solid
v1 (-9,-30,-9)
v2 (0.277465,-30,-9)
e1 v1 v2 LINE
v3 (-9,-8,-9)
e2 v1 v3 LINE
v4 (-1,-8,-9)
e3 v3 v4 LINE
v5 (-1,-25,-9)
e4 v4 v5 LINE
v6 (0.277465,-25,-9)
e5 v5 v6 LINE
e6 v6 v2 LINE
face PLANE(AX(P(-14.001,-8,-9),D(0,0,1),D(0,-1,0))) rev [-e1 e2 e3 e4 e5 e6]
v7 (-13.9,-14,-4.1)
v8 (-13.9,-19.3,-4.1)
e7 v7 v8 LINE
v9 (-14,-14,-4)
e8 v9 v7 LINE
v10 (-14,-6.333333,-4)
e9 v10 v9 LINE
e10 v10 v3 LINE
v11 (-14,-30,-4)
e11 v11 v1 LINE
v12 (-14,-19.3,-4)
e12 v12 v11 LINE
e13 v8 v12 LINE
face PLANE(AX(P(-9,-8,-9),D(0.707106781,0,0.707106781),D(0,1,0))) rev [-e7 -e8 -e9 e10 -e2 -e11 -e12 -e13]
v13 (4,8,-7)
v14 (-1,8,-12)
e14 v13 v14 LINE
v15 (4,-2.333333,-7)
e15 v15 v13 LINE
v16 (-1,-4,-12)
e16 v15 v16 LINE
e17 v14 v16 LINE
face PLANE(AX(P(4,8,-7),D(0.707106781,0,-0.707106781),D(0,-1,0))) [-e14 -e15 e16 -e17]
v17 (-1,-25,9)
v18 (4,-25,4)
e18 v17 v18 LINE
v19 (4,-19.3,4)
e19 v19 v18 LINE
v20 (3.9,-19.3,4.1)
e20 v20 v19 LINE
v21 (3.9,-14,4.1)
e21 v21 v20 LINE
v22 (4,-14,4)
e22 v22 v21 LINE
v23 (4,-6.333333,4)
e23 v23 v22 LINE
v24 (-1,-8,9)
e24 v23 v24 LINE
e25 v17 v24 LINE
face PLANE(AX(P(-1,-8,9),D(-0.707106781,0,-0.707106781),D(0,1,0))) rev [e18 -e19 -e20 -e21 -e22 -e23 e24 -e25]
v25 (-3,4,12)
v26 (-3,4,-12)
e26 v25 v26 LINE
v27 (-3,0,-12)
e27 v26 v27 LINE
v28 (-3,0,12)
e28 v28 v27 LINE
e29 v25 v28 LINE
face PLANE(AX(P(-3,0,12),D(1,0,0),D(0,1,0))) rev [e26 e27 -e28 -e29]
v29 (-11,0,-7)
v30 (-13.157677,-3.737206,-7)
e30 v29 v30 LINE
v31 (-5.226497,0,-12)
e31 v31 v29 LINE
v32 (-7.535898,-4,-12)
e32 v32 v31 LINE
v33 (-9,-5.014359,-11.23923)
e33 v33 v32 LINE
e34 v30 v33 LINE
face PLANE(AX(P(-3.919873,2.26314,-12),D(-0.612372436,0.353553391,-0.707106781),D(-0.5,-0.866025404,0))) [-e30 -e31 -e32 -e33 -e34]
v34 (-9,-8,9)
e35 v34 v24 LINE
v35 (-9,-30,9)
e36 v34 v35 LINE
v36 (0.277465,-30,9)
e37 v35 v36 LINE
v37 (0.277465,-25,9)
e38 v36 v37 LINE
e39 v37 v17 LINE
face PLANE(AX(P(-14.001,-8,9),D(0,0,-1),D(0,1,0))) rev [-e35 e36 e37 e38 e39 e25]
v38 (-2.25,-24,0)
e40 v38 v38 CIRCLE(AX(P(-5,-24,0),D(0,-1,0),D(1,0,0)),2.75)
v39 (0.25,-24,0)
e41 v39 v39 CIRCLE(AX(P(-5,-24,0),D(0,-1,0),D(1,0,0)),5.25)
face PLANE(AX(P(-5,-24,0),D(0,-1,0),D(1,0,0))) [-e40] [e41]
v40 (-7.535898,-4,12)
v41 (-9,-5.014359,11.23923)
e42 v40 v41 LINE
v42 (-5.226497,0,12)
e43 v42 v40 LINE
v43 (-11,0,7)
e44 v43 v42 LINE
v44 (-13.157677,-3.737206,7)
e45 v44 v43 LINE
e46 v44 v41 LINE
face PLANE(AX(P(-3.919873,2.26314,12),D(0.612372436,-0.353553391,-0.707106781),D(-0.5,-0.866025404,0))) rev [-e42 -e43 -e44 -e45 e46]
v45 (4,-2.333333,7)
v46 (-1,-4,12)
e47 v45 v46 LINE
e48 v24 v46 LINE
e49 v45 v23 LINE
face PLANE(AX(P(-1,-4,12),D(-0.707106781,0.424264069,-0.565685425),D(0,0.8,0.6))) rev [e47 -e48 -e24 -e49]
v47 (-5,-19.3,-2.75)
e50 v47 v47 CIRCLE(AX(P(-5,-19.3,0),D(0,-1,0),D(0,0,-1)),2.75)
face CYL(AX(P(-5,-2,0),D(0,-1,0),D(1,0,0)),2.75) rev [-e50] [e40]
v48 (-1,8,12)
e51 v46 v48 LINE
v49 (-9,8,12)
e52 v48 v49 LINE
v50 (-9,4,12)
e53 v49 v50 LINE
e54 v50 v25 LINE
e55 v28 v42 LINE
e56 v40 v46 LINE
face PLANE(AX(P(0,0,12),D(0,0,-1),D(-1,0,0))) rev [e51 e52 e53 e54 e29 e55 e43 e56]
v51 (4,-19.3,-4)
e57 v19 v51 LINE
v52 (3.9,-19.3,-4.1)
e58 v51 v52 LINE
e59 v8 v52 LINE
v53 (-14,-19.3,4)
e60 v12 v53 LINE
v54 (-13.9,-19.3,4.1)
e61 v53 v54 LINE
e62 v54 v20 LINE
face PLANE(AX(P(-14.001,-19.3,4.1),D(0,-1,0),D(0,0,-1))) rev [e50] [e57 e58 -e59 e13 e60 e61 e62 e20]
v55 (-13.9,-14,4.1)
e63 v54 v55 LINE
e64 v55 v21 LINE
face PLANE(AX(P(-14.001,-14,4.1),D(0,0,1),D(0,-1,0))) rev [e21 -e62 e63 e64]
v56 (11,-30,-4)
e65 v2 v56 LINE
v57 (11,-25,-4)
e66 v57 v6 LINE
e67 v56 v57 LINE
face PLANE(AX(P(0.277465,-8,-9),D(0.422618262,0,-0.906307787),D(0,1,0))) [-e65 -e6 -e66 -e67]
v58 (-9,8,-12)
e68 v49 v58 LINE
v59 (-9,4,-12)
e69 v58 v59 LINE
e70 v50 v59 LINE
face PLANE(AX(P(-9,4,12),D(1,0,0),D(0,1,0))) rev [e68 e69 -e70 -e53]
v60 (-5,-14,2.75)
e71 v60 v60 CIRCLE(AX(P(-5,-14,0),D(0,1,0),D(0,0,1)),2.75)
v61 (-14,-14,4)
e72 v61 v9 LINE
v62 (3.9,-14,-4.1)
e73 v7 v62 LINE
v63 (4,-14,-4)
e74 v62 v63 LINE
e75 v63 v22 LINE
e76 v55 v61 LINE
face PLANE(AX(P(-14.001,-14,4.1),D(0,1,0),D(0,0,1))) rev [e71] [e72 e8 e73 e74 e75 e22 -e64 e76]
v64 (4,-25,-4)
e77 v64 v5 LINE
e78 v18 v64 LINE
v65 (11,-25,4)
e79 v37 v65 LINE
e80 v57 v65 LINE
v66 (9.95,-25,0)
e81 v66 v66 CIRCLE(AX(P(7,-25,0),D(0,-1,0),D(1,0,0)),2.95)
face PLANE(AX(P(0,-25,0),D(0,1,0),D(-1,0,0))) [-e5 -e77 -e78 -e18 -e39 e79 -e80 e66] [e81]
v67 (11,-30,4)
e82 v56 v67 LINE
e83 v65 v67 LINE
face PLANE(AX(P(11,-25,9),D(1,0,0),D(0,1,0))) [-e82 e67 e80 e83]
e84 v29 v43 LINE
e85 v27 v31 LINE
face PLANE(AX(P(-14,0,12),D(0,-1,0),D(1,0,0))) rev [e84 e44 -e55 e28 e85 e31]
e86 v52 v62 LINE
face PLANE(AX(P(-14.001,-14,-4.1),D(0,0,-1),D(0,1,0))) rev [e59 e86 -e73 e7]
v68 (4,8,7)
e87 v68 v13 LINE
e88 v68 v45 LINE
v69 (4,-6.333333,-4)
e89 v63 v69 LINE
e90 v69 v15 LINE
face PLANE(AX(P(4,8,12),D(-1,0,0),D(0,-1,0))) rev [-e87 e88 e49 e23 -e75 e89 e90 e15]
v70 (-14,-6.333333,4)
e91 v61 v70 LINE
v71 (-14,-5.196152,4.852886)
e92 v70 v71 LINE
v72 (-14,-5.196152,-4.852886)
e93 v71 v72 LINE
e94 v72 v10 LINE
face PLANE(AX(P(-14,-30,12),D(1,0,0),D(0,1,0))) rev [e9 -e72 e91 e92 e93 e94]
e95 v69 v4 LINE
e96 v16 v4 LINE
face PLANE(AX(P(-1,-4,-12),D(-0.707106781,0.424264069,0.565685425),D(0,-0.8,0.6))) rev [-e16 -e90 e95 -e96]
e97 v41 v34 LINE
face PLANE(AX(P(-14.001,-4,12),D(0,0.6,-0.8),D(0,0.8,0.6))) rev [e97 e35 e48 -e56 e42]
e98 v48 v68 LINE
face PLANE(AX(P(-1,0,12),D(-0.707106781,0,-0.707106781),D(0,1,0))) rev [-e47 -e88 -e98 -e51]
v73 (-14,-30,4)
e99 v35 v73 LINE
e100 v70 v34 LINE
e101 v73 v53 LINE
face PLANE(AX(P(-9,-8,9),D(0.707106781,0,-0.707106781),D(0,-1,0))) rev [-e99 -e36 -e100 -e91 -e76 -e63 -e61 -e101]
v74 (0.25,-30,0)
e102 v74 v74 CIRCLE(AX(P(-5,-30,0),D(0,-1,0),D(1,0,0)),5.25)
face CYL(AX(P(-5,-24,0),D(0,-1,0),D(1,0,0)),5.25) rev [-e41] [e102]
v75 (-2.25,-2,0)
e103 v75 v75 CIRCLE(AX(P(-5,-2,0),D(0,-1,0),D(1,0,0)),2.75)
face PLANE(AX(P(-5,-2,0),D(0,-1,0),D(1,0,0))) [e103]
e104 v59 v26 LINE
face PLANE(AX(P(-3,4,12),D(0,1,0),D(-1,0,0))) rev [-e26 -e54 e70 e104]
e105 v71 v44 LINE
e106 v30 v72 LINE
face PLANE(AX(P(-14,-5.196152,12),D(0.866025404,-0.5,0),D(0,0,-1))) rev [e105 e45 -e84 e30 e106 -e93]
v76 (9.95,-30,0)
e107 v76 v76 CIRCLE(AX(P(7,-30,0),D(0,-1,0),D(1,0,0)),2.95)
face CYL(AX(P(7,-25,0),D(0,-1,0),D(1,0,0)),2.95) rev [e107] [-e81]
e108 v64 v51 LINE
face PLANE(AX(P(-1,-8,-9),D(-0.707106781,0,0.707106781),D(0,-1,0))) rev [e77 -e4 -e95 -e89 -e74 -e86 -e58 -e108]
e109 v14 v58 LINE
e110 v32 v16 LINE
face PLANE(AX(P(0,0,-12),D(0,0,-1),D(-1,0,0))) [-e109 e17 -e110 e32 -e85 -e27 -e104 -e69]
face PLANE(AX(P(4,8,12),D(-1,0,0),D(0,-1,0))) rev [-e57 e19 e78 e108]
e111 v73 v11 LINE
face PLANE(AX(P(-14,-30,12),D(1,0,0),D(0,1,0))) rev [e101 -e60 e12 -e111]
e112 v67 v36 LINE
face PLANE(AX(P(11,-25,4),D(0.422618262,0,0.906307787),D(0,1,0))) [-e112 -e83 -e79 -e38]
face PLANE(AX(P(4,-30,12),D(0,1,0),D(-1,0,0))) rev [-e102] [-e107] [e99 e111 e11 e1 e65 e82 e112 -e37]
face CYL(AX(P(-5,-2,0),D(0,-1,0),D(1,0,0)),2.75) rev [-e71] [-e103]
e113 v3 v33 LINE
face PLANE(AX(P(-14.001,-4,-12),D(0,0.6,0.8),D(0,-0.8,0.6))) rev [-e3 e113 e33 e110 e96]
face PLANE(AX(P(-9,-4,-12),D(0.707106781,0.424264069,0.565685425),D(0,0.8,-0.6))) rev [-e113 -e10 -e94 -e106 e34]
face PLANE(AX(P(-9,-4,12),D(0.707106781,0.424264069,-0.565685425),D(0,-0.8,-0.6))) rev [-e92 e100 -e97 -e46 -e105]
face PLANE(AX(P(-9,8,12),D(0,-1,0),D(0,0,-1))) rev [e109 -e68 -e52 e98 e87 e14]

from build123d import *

# Parameters (mm, degrees)
BOSS_EXTRUDE1_DEPTH = 12
SKETCH2_R           = 5.25
CUT_EXTRUDE1_DEPTH  = 6
CHAMFER2_SIZE       = 3
CHAMFER2_SIZE2      = 5.196152423
SKETCH4_R           = 2.75
CUT_EXTRUDE3_DEPTH  = 28
CUT_EXTRUDE4_REACH  = 38.986
SKETCH5_W           = 8.2
SKETCH5_H           = 5.3
CUT_EXTRUDE6_REACH  = 38.986
CHAMFER3_SIZE       = 5
SKETCH8_R           = 2.95
BOSS_EXTRUDE2_DEPTH = 5
CHAMFER4_SIZE       = 5
CHAMFER4_SIZE2      = 10.722534603


with BuildPart() as part:
    # Sketch1 → Boss-Extrude1 (new, symmetric)
    with BuildSketch(Plane.XY):
        Polygon((-9, 8), (4, 8), (4, -30), (-14, -30), (-14, 0), (-3, 0), (-3, 4), (-9, 4), align=None)
    extrude(amount=BOSS_EXTRUDE1_DEPTH, both=True)

    # Sketch2 → Cut-Extrude1 (cut)
    with BuildSketch(Plane.XZ.offset(30)):
        with Locations((-5, 0)):
            Circle(SKETCH2_R)
    extrude(amount=-CUT_EXTRUDE1_DEPTH, mode=Mode.SUBTRACT)

    # Chamfer2
    chamfer2_edges = [part.edges().sort_by_distance(p)[0] for p in [
        (-14, 0, 0),
    ]]
    chamfer2_side = [part.faces().sort_by_distance(p)[0] for p in [
        (-8.5, 0, 0),
    ]]
    chamfer(chamfer2_edges, length=CHAMFER2_SIZE, length2=CHAMFER2_SIZE2, reference=chamfer2_side[0])

    # Sketch4 → Cut-Extrude3 (cut)
    with BuildSketch(Plane.XZ.offset(30)):
        with Locations((-5, 0)):
            Circle(SKETCH4_R)
    extrude(amount=-CUT_EXTRUDE3_DEPTH, mode=Mode.SUBTRACT)

    # Sketch5 → Cut-Extrude4 (cut, up to next)
    with BuildSketch(Plane(origin=(4, 0, 0), x_dir=(0, 0, -1), z_dir=(1, 0, 0)), mode=Mode.PRIVATE) as cut_extrude4_sk1:
        with Locations((0, -16.65)):
            Rectangle(SKETCH5_W, SKETCH5_H)
    cut_extrude4_tool1 = extrude(cut_extrude4_sk1.sketch, amount=-CUT_EXTRUDE4_REACH, mode=Mode.PRIVATE) & part.part
    add(cut_extrude4_tool1.solids().sort_by_distance((4, -16.65, 0))[0], mode=Mode.SUBTRACT)

    # Sketch7 → Cut-Extrude6 (cut, up to next)
    with BuildSketch(Plane(origin=(4, 0, 0), x_dir=(0, 0, -1), z_dir=(1, 0, 0)), mode=Mode.PRIVATE) as cut_extrude6_sk1:
        Polygon((-12, -30), (-12, -4), (-9, -8), (-9, -30), align=None)
    cut_extrude6_tool1 = extrude(cut_extrude6_sk1.sketch, amount=-CUT_EXTRUDE6_REACH, mode=Mode.PRIVATE) & part.part
    # Sketch7 → Cut-Extrude6 (cut, up to next)
    with BuildSketch(Plane(origin=(4, 0, 0), x_dir=(0, 0, -1), z_dir=(1, 0, 0)), mode=Mode.PRIVATE) as cut_extrude6_sk2:
        Polygon((9, -30), (12, -30), (12, -4), (9, -8), align=None)
    cut_extrude6_tool2 = extrude(cut_extrude6_sk2.sketch, amount=-CUT_EXTRUDE6_REACH, mode=Mode.PRIVATE) & part.part
    add(cut_extrude6_tool1.solids().sort_by_distance((4, -17.972222, 10.541667))[0], mode=Mode.SUBTRACT)
    add(cut_extrude6_tool2.solids().sort_by_distance((4, -17.972222, -10.541667))[0], mode=Mode.SUBTRACT)

    # Chamfer3
    # the kernel refuses this chamfer: 5 mm, written as the material it takes off along each edge
    with BuildSketch(Plane(origin=(4, 4.85841494, 9), x_dir=(0, 0, -1), z_dir=(0, -1, 0))) as chamfer3_piece_1_section:
        Polygon((CHAMFER3_SIZE, 0), (0, -CHAMFER3_SIZE), (0, 0), align=None)
    chamfer3_piece_1 = extrude(amount=47.71682988, mode=Mode.PRIVATE)
    chamfer3_piece_1 = split(chamfer3_piece_1, bisect_by=Plane(origin=(5.357524482, 4.043900251, 10.086019586), z_dir=(0.7071067811865478, -0.4242640687119279, 0.5656854249492383)), keep=Keep.TOP, mode=Mode.PRIVATE)
    add(chamfer3_piece_1, mode=Mode.SUBTRACT)
    with BuildSketch(Plane(origin=(4, 6.286731952, 19.715048964), x_dir=(0, 0.5999999999999992, -0.8000000000000004), z_dir=(0, -0.8000000000000005, -0.5999999999999993))) as chamfer3_piece_2_section:
        Polygon((CHAMFER3_SIZE, 0), (0, -CHAMFER3_SIZE), (0, 0), align=None)
    chamfer3_piece_2 = extrude(amount=30.71682988, mode=Mode.PRIVATE)
    chamfer3_piece_2 = split(chamfer3_piece_2, bisect_by=Plane(origin=(-3.857524482, 6.286731952, 11.857524482), z_dir=(0.7071067811865476, 0, 0.7071067811865476)), keep=Keep.TOP, mode=Mode.PRIVATE)
    add(chamfer3_piece_2, mode=Mode.SUBTRACT)
    with BuildSketch(Plane(origin=(4, 20.85841494, 12), x_dir=(0, 0, -1), z_dir=(0, -1, 0)), Plane(origin=(4, 20.85841494, -12), x_dir=(-1, 0, 0), z_dir=(0, -1, 0))) as chamfer3_piece_3:
        Polygon((CHAMFER3_SIZE, 0), (0, -CHAMFER3_SIZE), (0, 0), align=None)
    extrude(amount=37.71682988, mode=Mode.SUBTRACT)
    with BuildSketch(Plane(origin=(4, 6.286731952, -19.715048964), x_dir=(-1, 0, 0), z_dir=(0, -0.8000000000000006, 0.5999999999999993))) as chamfer3_piece_4_section:
        Polygon((CHAMFER3_SIZE, 0), (0, -CHAMFER3_SIZE), (0, 0), align=None)
    chamfer3_piece_4 = extrude(amount=30.71682988, mode=Mode.PRIVATE)
    chamfer3_piece_4 = split(chamfer3_piece_4, bisect_by=Plane(origin=(-3.857524482, 6.286731952, -11.857524482), z_dir=(0.7071067811865476, 0, -0.7071067811865476)), keep=Keep.TOP, mode=Mode.PRIVATE)
    add(chamfer3_piece_4, mode=Mode.SUBTRACT)
    with BuildSketch(Plane(origin=(4, 4.85841494, -9), x_dir=(0, 0, 1), z_dir=(0, -1, 0))) as chamfer3_piece_5_section:
        Polygon((CHAMFER3_SIZE, 0), (0, CHAMFER3_SIZE), (0, 0), align=None)
    chamfer3_piece_5 = extrude(amount=47.71682988, mode=Mode.PRIVATE)
    chamfer3_piece_5 = split(chamfer3_piece_5, bisect_by=Plane(origin=(5.357524482, 4.043900251, -10.086019586), z_dir=(0.7071067811865476, -0.424264068711928, -0.5656854249492386)), keep=Keep.TOP, mode=Mode.PRIVATE)
    add(chamfer3_piece_5, mode=Mode.SUBTRACT)
    with BuildSketch(Plane(origin=(-14, -42.85841494, -9), x_dir=(1, 0, 0), z_dir=(0, 1, 0))) as chamfer3_piece_6_section:
        Polygon((CHAMFER3_SIZE, 0), (0, -CHAMFER3_SIZE), (0, 0), align=None)
    chamfer3_piece_6 = extrude(amount=47.71682988, mode=Mode.PRIVATE)
    chamfer3_piece_6 = split(chamfer3_piece_6, bisect_by=Plane(origin=(-1.042475518, -35.083900251, 1.366019586), z_dir=(-0.7071067811865479, -0.42426406871192784, -0.5656854249492381)), keep=Keep.TOP, mode=Mode.PRIVATE)
    add(chamfer3_piece_6, mode=Mode.SUBTRACT)
    with BuildSketch(Plane(origin=(-14, -18.286731952, -1.284951036), x_dir=(1, 0, 0), z_dir=(0, 0.8000000000000006, -0.5999999999999993))) as chamfer3_piece_7_section:
        Polygon((CHAMFER3_SIZE, 0), (0, -CHAMFER3_SIZE), (0, 0), align=None)
    chamfer3_piece_7 = extrude(amount=29.221639351, mode=Mode.PRIVATE)
    chamfer3_piece_7 = split(chamfer3_piece_7, bisect_by=Plane(origin=(-15.357524482, -18.286731952, -2.642475518), z_dir=(-0.7071067811865476, 0, -0.7071067811865476)), keep=Keep.TOP, mode=Mode.PRIVATE)
    add(chamfer3_piece_7, mode=Mode.SUBTRACT)
    with BuildSketch(Plane(origin=(-4.57079253, 11.13571399, -12), x_dir=(0.8660254037844396, -0.49999999999999833, 0), z_dir=(-0.49999999999999833, -0.8660254037844397, 0))) as chamfer3_piece_8_section:
        Polygon((CHAMFER3_SIZE, 0), (0, CHAMFER3_SIZE), (0, 0), align=None)
    chamfer3_piece_8 = extrude(amount=30.335632033, mode=Mode.PRIVATE)
    chamfer3_piece_8 = split(chamfer3_piece_8, bisect_by=Plane(origin=(-4.57079253, 0, -12), z_dir=(0, -1, 0)), keep=Keep.TOP, mode=Mode.PRIVATE)
    add(chamfer3_piece_8, mode=Mode.SUBTRACT)
    with BuildSketch(Plane(origin=(-4.57079253, 11.13571399, 12), x_dir=(0, 0, -1), z_dir=(-0.49999999999999833, -0.8660254037844397, 0))) as chamfer3_piece_9_section:
        Polygon((CHAMFER3_SIZE, 0), (0, CHAMFER3_SIZE), (0, 0), align=None)
    chamfer3_piece_9 = extrude(amount=30.335632033, mode=Mode.PRIVATE)
    chamfer3_piece_9 = split(chamfer3_piece_9, bisect_by=Plane(origin=(-4.57079253, 0, 12), z_dir=(0, -1, 0)), keep=Keep.TOP, mode=Mode.PRIVATE)
    add(chamfer3_piece_9, mode=Mode.SUBTRACT)
    with BuildSketch(Plane(origin=(-14, -18.286731952, 1.284951036), x_dir=(0, 0.5999999999999993, -0.8000000000000005), z_dir=(0, 0.8000000000000005, 0.5999999999999993))) as chamfer3_piece_10_section:
        Polygon((CHAMFER3_SIZE, 0), (0, -CHAMFER3_SIZE), (0, 0), align=None)
    chamfer3_piece_10 = extrude(amount=29.221639351, mode=Mode.PRIVATE)
    chamfer3_piece_10 = split(chamfer3_piece_10, bisect_by=Plane(origin=(-15.357524482, -18.286731952, 2.642475518), z_dir=(-0.7071067811865476, 0, 0.7071067811865476)), keep=Keep.TOP, mode=Mode.PRIVATE)
    add(chamfer3_piece_10, mode=Mode.SUBTRACT)
    with BuildSketch(Plane(origin=(-14, -42.85841494, 9), x_dir=(0, 0, -1), z_dir=(0, 1, 0))) as chamfer3_piece_11_section:
        Polygon((CHAMFER3_SIZE, 0), (0, -CHAMFER3_SIZE), (0, 0), align=None)
    chamfer3_piece_11 = extrude(amount=47.71682988, mode=Mode.PRIVATE)
    chamfer3_piece_11 = split(chamfer3_piece_11, bisect_by=Plane(origin=(-1.042475518, -35.083900251, -1.366019586), z_dir=(-0.7071067811865476, -0.4242640687119281, 0.5656854249492385)), keep=Keep.TOP, mode=Mode.PRIVATE)
    add(chamfer3_piece_11, mode=Mode.SUBTRACT)

    # Sketch8 → Boss-Extrude2 (add)
    with BuildSketch(Plane.XZ.offset(30)):
        Polygon((4, 4), (-1, 9), (11, 9), (11, -9), (-1, -9), (4, -4), align=None)
        with Locations((7, 0)):
            Circle(SKETCH8_R, mode=Mode.SUBTRACT)
    extrude(amount=-BOSS_EXTRUDE2_DEPTH)

    # Chamfer4
    chamfer4_edges = [part.edges().sort_by_distance(p)[0] for p in [
        (11, -27.5, 9),
        (11, -27.5, -9),
    ]]
    chamfer4_side = [part.faces().sort_by_distance(p)[0] for p in [
        (11, -27.5, 0),
    ]]
    chamfer(chamfer4_edges, length=CHAMFER4_SIZE, length2=CHAMFER4_SIZE2, reference=chamfer4_side[0])


solid = part.part
